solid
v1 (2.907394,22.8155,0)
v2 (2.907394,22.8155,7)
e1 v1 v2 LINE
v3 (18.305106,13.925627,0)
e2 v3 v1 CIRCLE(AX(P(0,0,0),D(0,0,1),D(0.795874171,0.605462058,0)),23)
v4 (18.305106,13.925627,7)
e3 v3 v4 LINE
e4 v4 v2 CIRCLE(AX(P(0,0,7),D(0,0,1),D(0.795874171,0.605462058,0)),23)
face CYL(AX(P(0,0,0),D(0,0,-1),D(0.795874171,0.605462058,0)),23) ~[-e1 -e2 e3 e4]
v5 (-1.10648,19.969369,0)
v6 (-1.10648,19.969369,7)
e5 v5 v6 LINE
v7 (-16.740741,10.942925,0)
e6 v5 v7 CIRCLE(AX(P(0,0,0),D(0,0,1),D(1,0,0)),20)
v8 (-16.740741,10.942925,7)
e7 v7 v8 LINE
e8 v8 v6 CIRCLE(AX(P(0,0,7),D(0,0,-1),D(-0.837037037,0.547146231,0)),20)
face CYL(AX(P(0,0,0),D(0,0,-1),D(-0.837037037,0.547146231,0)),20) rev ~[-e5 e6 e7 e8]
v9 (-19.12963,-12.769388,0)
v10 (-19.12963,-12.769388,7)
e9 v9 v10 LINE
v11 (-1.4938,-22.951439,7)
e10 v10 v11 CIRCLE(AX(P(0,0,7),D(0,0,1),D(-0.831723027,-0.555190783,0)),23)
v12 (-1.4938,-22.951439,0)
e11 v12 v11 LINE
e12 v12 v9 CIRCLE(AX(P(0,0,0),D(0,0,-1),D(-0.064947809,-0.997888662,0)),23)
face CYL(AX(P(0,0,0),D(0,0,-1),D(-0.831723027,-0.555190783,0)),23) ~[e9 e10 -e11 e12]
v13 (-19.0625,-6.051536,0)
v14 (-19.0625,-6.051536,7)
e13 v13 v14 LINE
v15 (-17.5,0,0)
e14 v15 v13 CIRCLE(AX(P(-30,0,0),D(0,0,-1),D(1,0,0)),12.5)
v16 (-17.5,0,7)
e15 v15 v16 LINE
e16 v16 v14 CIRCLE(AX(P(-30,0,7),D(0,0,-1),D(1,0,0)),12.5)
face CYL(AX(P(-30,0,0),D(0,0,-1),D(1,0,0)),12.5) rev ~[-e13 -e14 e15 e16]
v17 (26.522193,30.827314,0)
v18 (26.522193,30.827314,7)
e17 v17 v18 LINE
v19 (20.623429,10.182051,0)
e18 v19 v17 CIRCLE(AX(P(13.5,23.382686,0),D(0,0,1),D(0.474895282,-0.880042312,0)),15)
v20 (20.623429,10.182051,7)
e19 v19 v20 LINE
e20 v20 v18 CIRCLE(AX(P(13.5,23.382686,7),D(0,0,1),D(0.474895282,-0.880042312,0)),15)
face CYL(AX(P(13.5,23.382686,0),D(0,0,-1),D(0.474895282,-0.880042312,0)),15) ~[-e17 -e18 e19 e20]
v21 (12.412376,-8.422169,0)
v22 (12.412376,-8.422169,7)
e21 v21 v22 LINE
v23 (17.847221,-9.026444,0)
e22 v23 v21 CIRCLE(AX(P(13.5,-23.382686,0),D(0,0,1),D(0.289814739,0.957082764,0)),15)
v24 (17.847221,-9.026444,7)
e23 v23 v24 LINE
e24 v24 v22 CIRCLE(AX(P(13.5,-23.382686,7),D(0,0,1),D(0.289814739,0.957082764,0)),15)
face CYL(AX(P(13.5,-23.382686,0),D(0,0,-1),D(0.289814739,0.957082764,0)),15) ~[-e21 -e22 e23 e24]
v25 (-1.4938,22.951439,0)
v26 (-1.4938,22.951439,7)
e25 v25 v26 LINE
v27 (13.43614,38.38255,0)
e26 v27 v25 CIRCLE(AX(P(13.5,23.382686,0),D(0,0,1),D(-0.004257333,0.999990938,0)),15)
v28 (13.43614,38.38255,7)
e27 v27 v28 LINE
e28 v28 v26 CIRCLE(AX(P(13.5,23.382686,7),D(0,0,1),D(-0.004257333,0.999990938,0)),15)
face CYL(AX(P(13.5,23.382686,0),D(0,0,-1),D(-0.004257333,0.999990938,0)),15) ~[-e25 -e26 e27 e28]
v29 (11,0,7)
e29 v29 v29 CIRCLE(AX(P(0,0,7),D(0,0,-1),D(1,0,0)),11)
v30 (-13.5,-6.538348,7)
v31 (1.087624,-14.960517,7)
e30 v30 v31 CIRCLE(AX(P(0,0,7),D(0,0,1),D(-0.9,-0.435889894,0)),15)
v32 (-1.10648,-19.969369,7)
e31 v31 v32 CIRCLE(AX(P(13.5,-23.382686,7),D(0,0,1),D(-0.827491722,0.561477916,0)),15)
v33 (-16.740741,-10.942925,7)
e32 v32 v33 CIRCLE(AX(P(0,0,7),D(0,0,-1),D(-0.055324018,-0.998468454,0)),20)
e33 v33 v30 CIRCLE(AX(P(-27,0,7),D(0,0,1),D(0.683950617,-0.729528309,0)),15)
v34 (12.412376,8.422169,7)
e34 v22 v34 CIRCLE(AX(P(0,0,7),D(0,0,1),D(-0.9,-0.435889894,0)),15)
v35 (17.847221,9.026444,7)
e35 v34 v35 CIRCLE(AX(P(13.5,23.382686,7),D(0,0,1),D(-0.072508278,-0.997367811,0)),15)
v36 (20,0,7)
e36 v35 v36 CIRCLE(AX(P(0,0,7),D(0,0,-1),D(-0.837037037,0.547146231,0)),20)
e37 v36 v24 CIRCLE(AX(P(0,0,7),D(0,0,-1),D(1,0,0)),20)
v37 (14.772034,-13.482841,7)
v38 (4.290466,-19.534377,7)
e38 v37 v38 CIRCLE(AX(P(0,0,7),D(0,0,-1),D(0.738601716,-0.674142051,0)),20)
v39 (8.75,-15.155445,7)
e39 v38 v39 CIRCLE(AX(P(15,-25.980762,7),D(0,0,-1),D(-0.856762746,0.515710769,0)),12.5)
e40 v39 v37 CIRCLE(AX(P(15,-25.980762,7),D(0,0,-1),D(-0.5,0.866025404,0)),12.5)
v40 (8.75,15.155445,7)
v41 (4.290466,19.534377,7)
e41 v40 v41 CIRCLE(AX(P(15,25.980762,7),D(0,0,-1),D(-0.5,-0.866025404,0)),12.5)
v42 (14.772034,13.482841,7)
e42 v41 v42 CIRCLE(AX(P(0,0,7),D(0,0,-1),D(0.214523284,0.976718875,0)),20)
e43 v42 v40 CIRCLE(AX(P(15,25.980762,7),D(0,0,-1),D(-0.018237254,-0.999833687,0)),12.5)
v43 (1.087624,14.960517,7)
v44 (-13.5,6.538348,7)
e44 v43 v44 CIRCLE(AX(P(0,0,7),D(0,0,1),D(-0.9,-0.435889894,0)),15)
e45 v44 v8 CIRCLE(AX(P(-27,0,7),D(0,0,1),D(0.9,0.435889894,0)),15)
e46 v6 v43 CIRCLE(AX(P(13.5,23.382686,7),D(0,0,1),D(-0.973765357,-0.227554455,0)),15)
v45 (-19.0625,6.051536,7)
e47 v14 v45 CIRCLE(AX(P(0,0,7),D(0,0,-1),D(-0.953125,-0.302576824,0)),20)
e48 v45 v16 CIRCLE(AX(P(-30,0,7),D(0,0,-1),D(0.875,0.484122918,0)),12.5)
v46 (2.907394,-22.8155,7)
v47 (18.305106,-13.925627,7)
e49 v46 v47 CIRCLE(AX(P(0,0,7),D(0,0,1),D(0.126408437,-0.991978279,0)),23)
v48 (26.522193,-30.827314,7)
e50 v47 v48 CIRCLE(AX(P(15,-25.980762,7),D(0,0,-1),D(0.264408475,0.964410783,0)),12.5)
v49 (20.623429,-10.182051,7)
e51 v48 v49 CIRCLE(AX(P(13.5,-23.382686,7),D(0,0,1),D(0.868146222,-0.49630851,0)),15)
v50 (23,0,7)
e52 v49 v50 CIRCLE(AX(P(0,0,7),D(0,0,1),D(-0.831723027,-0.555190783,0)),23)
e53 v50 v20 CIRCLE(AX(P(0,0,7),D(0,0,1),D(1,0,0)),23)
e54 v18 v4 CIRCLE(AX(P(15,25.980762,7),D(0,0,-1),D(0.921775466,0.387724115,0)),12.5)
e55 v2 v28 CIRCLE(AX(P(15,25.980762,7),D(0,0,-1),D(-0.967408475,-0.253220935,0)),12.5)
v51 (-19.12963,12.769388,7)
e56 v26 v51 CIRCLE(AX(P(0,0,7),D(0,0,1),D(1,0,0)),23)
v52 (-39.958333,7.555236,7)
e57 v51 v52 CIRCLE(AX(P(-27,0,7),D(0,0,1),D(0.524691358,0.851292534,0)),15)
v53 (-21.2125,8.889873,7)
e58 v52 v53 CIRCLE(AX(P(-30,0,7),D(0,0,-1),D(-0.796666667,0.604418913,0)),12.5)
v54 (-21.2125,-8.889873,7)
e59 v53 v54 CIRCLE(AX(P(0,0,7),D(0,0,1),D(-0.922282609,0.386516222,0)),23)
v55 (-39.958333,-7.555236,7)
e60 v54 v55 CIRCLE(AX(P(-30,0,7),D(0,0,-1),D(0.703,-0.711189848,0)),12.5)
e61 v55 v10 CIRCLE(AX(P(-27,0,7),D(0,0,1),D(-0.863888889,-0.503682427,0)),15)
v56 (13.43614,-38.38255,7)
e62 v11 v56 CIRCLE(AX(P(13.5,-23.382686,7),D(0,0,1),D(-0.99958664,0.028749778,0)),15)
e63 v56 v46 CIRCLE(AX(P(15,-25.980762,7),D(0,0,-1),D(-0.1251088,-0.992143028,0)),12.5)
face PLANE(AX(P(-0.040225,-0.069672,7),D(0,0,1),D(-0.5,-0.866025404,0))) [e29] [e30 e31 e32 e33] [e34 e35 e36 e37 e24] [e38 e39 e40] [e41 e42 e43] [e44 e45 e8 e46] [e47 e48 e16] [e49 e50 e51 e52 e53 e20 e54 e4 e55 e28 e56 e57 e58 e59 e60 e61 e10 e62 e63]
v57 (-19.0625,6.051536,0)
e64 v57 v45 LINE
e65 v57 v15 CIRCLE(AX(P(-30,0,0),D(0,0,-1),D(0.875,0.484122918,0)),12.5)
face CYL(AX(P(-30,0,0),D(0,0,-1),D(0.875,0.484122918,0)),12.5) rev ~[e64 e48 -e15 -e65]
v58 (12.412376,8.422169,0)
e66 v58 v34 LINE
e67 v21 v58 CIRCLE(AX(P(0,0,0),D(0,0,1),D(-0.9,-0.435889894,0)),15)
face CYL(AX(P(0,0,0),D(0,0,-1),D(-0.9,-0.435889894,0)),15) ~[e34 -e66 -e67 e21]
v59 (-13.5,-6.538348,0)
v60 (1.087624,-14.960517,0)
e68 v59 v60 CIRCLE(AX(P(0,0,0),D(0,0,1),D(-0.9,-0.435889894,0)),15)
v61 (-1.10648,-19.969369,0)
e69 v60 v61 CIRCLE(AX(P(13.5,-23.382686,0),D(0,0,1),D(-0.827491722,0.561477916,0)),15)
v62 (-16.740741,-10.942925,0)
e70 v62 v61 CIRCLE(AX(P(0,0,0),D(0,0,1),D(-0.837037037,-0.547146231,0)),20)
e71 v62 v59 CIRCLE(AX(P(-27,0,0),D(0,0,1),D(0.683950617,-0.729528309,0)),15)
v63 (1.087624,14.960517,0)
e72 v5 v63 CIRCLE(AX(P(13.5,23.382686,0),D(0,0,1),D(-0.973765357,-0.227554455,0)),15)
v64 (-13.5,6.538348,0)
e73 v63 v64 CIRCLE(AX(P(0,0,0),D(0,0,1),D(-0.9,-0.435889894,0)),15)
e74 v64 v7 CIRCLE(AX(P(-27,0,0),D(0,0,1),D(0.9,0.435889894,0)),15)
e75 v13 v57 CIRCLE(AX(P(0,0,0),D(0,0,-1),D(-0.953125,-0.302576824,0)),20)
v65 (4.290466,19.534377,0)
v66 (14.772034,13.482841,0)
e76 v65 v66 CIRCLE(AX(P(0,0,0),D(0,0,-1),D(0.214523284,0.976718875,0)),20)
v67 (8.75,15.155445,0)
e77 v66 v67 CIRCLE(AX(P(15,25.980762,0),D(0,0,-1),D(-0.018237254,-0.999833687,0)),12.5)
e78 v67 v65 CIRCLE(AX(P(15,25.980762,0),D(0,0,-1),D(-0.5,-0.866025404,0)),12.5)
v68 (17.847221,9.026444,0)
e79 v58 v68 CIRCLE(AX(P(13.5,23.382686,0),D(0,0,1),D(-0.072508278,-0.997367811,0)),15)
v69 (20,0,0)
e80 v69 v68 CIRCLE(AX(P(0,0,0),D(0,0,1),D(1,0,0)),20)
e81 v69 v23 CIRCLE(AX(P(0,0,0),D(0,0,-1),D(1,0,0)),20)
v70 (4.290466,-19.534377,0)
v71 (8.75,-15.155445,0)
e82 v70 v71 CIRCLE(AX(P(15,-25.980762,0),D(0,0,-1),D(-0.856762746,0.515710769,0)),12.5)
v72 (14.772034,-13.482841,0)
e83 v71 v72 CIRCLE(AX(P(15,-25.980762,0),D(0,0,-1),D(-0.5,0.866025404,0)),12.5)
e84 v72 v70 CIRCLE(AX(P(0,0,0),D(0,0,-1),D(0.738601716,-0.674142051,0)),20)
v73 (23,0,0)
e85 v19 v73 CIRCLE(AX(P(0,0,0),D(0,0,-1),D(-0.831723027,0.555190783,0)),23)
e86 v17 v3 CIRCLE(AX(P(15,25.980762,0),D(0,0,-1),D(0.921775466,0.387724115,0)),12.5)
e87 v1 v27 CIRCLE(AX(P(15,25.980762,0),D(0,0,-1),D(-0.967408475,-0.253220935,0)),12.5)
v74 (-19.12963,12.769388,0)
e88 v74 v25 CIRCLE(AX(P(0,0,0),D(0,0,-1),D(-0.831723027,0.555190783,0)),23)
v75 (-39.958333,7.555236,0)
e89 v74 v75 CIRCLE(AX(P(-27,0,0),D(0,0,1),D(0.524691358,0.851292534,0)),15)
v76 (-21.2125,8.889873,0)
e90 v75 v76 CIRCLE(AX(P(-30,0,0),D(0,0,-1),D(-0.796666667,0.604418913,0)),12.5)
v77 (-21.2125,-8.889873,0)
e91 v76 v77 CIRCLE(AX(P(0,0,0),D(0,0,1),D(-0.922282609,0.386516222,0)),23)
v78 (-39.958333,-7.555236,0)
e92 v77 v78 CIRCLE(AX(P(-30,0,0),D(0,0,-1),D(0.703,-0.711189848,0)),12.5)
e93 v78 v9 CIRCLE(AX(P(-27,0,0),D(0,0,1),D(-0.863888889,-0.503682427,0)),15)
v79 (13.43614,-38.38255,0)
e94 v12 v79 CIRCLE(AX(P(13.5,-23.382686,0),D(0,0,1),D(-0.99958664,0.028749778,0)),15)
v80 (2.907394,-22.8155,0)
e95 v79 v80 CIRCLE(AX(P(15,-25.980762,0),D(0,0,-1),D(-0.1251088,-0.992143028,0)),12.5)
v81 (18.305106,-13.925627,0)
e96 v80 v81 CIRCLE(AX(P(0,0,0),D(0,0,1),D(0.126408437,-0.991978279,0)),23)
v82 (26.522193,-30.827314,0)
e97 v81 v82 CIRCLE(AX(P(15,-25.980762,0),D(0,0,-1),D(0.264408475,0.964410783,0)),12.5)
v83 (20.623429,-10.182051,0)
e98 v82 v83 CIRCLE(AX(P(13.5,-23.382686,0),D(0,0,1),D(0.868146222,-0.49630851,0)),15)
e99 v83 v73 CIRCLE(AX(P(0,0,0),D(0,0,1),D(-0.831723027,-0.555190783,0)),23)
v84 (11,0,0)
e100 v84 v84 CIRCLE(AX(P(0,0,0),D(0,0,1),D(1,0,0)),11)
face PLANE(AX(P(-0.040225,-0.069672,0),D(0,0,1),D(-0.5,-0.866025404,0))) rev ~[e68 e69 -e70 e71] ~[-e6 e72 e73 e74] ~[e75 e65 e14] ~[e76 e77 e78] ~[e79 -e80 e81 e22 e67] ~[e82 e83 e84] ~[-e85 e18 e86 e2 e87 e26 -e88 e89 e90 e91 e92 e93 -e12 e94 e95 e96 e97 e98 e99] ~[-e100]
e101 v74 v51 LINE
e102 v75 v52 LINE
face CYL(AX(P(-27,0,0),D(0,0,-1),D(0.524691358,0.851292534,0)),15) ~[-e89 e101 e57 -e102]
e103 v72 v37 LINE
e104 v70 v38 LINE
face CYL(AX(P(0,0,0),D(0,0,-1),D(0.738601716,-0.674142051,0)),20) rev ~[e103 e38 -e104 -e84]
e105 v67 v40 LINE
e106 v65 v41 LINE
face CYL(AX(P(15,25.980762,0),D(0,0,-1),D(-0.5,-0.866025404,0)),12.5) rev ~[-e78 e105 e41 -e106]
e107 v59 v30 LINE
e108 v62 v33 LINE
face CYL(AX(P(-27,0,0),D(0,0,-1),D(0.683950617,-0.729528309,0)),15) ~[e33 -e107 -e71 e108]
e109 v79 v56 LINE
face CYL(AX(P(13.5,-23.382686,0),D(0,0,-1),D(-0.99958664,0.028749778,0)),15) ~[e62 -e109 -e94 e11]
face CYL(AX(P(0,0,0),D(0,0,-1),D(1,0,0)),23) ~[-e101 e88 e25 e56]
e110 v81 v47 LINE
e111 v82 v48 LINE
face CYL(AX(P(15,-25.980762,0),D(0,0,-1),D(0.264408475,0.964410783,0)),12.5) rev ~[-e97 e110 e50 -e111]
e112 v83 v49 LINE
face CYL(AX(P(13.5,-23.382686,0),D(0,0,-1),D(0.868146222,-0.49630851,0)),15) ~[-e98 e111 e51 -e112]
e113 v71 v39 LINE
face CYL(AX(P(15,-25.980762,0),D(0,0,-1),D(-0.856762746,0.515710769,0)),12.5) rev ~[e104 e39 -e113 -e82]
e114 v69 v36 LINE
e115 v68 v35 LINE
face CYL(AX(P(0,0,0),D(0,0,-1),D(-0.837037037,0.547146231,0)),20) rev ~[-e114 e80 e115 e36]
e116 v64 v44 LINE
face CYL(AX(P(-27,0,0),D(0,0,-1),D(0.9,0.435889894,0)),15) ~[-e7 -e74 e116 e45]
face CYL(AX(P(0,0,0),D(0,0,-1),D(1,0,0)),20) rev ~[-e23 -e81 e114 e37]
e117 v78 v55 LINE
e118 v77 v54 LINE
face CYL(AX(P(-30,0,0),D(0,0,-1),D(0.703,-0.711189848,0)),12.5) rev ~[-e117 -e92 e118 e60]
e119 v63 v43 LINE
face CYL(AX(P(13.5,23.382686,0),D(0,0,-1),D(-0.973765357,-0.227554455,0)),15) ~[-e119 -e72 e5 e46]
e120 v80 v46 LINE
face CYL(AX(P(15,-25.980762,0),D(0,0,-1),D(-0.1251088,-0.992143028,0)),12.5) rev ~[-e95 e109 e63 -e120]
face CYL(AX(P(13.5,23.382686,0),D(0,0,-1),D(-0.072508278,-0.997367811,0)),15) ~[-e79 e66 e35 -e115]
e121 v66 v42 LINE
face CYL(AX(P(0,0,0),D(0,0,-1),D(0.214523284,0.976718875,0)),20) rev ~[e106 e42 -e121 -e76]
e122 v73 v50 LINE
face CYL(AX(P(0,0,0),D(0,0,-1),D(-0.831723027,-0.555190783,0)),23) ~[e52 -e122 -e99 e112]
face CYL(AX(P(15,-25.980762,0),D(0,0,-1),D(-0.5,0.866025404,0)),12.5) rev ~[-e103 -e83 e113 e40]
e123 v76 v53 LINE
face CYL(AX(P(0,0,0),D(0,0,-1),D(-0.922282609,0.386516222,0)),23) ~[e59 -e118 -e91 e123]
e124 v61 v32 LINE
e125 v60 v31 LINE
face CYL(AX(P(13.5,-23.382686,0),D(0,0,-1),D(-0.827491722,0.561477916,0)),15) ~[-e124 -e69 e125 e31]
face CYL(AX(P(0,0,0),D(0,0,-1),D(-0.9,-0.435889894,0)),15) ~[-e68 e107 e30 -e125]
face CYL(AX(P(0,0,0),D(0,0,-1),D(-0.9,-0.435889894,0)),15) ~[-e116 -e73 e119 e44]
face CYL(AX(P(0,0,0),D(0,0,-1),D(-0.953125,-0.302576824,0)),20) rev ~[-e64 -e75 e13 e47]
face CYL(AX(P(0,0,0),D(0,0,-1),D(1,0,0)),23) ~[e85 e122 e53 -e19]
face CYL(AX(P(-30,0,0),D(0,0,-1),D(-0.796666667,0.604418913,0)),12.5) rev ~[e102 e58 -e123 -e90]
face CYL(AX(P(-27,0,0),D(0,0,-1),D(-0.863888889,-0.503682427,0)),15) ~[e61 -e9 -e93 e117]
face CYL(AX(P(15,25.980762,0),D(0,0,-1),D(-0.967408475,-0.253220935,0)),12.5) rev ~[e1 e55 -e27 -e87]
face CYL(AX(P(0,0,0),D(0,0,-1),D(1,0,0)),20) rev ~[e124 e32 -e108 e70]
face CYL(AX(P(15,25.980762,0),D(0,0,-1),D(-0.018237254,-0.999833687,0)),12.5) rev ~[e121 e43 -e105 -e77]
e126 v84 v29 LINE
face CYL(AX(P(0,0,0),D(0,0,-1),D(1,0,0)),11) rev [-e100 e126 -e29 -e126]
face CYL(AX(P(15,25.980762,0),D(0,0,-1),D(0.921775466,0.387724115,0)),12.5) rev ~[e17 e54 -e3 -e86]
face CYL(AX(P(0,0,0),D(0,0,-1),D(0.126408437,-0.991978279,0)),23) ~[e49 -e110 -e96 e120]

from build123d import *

# Parameters (mm, degrees)
F0_R     = 11
F1_DEPTH = 7
F2_COUNT = 3


# Not quite as in the source:
# - a feature names something its author has since deleted; it is built from what else it names


with BuildPart() as f1:
    # F0 (on Top) → F1 (new body)
    with BuildSketch(Plane.XY):
        with BuildLine():
            ThreePointArc((-13.5, -6.5383484153), (3.3541019662, -14.6201915172), (15, 0))
            ThreePointArc((15, 0), (3.3541019662, 14.6201915172), (-13.5, 6.5383484153))
            ThreePointArc((-13.5, 6.5383484153), (-12.3798084828, 3.3541019662), (-12, 0))
            ThreePointArc((-12, 0), (-12.3798084828, -3.3541019662), (-13.5, -6.5383484153))
        make_face()
        Circle(F0_R, mode=Mode.SUBTRACT)
        with BuildLine():
            ThreePointArc((-12, 0), (-12.3798084828, 3.3541019662), (-13.5, 6.5383484153))
            ThreePointArc((-13.5, 6.5383484153), (-15, 0), (-13.5, -6.5383484153))
            ThreePointArc((-13.5, -6.5383484153), (-12.3798084828, -3.3541019662), (-12, 0))
        make_face()
        with BuildLine():
            ThreePointArc((-13.5, -6.5383484153), (-15, 0), (-13.5, 6.5383484153))
            ThreePointArc((-13.5, 6.5383484153), (-14.9179607249, 8.8895628102), (-16.7407407407, 10.9429246297))
            ThreePointArc((-16.7407407407, 10.9429246297), (-18.0679116501, 8.5761628135), (-19.0625, 6.0515364784))
            ThreePointArc((-19.0625, 6.0515364784), (-17.8969270431, 3.125), (-17.5, 0))
            ThreePointArc((-17.5, 0), (-17.8969270431, -3.125), (-19.0625, -6.0515364784))
            ThreePointArc((-19.0625, -6.0515364784), (-18.0679116501, -8.5761628135), (-16.7407407407, -10.9429246297))
            ThreePointArc((-16.7407407407, -10.9429246297), (-14.9179607249, -8.8895628102), (-13.5, -6.5383484153))
        make_face()
        with BuildLine():
            ThreePointArc((-19.0625, 6.0515364784), (-18.0679116501, 8.5761628135), (-16.7407407407, 10.9429246297))
            ThreePointArc((-16.7407407407, 10.9429246297), (-17.8892997113, 11.9161713755), (-19.1296296296, 12.7693880133))
            ThreePointArc((-19.1296296296, 12.7693880133), (-20.264118899, 10.879590307), (-21.2125, 8.8898731009))
            ThreePointArc((-21.2125, 8.8898731009), (-20.0359172552, 7.5476522876), (-19.0625, 6.0515364784))
        make_face()
        with BuildLine():
            ThreePointArc((-19.1296296296, 12.7693880133), (-17.8892997113, 11.9161713755), (-16.7407407407, 10.9429246297))
            ThreePointArc((-16.7407407407, 10.9429246297), (5.7089922572, 19.1678743581), (20, 0))
            ThreePointArc((20, 0), (5.7089922572, -19.1678743581), (-16.7407407407, -10.9429246297))
            ThreePointArc((-16.7407407407, -10.9429246297), (-17.8892997113, -11.9161713755), (-19.1296296296, -12.7693880133))
            ThreePointArc((-19.1296296296, -12.7693880133), (6.6715260068, -22.011150373), (23, 0))
            ThreePointArc((23, 0), (6.6715260068, 22.011150373), (-19.1296296296, 12.7693880133))
        make_face()
        with BuildLine():
            ThreePointArc((-19.1296296296, -12.7693880133), (-17.8892997113, -11.9161713755), (-16.7407407407, -10.9429246297))
            ThreePointArc((-16.7407407407, -10.9429246297), (-18.0679116501, -8.5761628135), (-19.0625, -6.0515364784))
            ThreePointArc((-19.0625, -6.0515364784), (-20.0359172552, -7.5476522876), (-21.2125, -8.8898731009))
            ThreePointArc((-21.2125, -8.8898731009), (-20.264118899, -10.879590307), (-19.1296296296, -12.7693880133))
        make_face()
        with BuildLine():
            ThreePointArc((-21.2125, 8.8898731009), (-20.264118899, 10.879590307), (-19.1296296296, 12.7693880133))
            ThreePointArc((-19.1296296296, 12.7693880133), (-30.6426207614, 14.5509901377), (-39.9583333333, 7.5552364107))
            ThreePointArc((-39.9583333333, 7.5552364107), (-30.8877085374, 12.4684390985), (-21.2125, 8.8898731009))
        make_face()
        with BuildLine():
            ThreePointArc((-19.0625, -6.0515364784), (-20, 0), (-19.0625, 6.0515364784))
            ThreePointArc((-19.0625, 6.0515364784), (-20.0359172552, 7.5476522876), (-21.2125, 8.8898731009))
            ThreePointArc((-21.2125, 8.8898731009), (-23, 0), (-21.2125, -8.8898731009))
            ThreePointArc((-21.2125, -8.8898731009), (-20.0359172552, -7.5476522876), (-19.0625, -6.0515364784))
        make_face()
        with BuildLine():
            ThreePointArc((-39.9583333333, -7.5552364107), (-30.6426207614, -14.5509901377), (-19.1296296296, -12.7693880133))
            ThreePointArc((-19.1296296296, -12.7693880133), (-20.264118899, -10.879590307), (-21.2125, -8.8898731009))
            ThreePointArc((-21.2125, -8.8898731009), (-30.8877085374, -12.4684390985), (-39.9583333333, -7.5552364107))
        make_face()
    extrude(amount=F1_DEPTH)

    # F2: F1 ×3 about axis
    f2_axis = Axis((0, 0, 0), (0, 0, 1))


with BuildPart() as f1_1:
    add(f1.part)
    for i in range(1, F2_COUNT):
        add(f1.part.rotate(f2_axis, i * 360 / F2_COUNT))


solid = f1_1.part
